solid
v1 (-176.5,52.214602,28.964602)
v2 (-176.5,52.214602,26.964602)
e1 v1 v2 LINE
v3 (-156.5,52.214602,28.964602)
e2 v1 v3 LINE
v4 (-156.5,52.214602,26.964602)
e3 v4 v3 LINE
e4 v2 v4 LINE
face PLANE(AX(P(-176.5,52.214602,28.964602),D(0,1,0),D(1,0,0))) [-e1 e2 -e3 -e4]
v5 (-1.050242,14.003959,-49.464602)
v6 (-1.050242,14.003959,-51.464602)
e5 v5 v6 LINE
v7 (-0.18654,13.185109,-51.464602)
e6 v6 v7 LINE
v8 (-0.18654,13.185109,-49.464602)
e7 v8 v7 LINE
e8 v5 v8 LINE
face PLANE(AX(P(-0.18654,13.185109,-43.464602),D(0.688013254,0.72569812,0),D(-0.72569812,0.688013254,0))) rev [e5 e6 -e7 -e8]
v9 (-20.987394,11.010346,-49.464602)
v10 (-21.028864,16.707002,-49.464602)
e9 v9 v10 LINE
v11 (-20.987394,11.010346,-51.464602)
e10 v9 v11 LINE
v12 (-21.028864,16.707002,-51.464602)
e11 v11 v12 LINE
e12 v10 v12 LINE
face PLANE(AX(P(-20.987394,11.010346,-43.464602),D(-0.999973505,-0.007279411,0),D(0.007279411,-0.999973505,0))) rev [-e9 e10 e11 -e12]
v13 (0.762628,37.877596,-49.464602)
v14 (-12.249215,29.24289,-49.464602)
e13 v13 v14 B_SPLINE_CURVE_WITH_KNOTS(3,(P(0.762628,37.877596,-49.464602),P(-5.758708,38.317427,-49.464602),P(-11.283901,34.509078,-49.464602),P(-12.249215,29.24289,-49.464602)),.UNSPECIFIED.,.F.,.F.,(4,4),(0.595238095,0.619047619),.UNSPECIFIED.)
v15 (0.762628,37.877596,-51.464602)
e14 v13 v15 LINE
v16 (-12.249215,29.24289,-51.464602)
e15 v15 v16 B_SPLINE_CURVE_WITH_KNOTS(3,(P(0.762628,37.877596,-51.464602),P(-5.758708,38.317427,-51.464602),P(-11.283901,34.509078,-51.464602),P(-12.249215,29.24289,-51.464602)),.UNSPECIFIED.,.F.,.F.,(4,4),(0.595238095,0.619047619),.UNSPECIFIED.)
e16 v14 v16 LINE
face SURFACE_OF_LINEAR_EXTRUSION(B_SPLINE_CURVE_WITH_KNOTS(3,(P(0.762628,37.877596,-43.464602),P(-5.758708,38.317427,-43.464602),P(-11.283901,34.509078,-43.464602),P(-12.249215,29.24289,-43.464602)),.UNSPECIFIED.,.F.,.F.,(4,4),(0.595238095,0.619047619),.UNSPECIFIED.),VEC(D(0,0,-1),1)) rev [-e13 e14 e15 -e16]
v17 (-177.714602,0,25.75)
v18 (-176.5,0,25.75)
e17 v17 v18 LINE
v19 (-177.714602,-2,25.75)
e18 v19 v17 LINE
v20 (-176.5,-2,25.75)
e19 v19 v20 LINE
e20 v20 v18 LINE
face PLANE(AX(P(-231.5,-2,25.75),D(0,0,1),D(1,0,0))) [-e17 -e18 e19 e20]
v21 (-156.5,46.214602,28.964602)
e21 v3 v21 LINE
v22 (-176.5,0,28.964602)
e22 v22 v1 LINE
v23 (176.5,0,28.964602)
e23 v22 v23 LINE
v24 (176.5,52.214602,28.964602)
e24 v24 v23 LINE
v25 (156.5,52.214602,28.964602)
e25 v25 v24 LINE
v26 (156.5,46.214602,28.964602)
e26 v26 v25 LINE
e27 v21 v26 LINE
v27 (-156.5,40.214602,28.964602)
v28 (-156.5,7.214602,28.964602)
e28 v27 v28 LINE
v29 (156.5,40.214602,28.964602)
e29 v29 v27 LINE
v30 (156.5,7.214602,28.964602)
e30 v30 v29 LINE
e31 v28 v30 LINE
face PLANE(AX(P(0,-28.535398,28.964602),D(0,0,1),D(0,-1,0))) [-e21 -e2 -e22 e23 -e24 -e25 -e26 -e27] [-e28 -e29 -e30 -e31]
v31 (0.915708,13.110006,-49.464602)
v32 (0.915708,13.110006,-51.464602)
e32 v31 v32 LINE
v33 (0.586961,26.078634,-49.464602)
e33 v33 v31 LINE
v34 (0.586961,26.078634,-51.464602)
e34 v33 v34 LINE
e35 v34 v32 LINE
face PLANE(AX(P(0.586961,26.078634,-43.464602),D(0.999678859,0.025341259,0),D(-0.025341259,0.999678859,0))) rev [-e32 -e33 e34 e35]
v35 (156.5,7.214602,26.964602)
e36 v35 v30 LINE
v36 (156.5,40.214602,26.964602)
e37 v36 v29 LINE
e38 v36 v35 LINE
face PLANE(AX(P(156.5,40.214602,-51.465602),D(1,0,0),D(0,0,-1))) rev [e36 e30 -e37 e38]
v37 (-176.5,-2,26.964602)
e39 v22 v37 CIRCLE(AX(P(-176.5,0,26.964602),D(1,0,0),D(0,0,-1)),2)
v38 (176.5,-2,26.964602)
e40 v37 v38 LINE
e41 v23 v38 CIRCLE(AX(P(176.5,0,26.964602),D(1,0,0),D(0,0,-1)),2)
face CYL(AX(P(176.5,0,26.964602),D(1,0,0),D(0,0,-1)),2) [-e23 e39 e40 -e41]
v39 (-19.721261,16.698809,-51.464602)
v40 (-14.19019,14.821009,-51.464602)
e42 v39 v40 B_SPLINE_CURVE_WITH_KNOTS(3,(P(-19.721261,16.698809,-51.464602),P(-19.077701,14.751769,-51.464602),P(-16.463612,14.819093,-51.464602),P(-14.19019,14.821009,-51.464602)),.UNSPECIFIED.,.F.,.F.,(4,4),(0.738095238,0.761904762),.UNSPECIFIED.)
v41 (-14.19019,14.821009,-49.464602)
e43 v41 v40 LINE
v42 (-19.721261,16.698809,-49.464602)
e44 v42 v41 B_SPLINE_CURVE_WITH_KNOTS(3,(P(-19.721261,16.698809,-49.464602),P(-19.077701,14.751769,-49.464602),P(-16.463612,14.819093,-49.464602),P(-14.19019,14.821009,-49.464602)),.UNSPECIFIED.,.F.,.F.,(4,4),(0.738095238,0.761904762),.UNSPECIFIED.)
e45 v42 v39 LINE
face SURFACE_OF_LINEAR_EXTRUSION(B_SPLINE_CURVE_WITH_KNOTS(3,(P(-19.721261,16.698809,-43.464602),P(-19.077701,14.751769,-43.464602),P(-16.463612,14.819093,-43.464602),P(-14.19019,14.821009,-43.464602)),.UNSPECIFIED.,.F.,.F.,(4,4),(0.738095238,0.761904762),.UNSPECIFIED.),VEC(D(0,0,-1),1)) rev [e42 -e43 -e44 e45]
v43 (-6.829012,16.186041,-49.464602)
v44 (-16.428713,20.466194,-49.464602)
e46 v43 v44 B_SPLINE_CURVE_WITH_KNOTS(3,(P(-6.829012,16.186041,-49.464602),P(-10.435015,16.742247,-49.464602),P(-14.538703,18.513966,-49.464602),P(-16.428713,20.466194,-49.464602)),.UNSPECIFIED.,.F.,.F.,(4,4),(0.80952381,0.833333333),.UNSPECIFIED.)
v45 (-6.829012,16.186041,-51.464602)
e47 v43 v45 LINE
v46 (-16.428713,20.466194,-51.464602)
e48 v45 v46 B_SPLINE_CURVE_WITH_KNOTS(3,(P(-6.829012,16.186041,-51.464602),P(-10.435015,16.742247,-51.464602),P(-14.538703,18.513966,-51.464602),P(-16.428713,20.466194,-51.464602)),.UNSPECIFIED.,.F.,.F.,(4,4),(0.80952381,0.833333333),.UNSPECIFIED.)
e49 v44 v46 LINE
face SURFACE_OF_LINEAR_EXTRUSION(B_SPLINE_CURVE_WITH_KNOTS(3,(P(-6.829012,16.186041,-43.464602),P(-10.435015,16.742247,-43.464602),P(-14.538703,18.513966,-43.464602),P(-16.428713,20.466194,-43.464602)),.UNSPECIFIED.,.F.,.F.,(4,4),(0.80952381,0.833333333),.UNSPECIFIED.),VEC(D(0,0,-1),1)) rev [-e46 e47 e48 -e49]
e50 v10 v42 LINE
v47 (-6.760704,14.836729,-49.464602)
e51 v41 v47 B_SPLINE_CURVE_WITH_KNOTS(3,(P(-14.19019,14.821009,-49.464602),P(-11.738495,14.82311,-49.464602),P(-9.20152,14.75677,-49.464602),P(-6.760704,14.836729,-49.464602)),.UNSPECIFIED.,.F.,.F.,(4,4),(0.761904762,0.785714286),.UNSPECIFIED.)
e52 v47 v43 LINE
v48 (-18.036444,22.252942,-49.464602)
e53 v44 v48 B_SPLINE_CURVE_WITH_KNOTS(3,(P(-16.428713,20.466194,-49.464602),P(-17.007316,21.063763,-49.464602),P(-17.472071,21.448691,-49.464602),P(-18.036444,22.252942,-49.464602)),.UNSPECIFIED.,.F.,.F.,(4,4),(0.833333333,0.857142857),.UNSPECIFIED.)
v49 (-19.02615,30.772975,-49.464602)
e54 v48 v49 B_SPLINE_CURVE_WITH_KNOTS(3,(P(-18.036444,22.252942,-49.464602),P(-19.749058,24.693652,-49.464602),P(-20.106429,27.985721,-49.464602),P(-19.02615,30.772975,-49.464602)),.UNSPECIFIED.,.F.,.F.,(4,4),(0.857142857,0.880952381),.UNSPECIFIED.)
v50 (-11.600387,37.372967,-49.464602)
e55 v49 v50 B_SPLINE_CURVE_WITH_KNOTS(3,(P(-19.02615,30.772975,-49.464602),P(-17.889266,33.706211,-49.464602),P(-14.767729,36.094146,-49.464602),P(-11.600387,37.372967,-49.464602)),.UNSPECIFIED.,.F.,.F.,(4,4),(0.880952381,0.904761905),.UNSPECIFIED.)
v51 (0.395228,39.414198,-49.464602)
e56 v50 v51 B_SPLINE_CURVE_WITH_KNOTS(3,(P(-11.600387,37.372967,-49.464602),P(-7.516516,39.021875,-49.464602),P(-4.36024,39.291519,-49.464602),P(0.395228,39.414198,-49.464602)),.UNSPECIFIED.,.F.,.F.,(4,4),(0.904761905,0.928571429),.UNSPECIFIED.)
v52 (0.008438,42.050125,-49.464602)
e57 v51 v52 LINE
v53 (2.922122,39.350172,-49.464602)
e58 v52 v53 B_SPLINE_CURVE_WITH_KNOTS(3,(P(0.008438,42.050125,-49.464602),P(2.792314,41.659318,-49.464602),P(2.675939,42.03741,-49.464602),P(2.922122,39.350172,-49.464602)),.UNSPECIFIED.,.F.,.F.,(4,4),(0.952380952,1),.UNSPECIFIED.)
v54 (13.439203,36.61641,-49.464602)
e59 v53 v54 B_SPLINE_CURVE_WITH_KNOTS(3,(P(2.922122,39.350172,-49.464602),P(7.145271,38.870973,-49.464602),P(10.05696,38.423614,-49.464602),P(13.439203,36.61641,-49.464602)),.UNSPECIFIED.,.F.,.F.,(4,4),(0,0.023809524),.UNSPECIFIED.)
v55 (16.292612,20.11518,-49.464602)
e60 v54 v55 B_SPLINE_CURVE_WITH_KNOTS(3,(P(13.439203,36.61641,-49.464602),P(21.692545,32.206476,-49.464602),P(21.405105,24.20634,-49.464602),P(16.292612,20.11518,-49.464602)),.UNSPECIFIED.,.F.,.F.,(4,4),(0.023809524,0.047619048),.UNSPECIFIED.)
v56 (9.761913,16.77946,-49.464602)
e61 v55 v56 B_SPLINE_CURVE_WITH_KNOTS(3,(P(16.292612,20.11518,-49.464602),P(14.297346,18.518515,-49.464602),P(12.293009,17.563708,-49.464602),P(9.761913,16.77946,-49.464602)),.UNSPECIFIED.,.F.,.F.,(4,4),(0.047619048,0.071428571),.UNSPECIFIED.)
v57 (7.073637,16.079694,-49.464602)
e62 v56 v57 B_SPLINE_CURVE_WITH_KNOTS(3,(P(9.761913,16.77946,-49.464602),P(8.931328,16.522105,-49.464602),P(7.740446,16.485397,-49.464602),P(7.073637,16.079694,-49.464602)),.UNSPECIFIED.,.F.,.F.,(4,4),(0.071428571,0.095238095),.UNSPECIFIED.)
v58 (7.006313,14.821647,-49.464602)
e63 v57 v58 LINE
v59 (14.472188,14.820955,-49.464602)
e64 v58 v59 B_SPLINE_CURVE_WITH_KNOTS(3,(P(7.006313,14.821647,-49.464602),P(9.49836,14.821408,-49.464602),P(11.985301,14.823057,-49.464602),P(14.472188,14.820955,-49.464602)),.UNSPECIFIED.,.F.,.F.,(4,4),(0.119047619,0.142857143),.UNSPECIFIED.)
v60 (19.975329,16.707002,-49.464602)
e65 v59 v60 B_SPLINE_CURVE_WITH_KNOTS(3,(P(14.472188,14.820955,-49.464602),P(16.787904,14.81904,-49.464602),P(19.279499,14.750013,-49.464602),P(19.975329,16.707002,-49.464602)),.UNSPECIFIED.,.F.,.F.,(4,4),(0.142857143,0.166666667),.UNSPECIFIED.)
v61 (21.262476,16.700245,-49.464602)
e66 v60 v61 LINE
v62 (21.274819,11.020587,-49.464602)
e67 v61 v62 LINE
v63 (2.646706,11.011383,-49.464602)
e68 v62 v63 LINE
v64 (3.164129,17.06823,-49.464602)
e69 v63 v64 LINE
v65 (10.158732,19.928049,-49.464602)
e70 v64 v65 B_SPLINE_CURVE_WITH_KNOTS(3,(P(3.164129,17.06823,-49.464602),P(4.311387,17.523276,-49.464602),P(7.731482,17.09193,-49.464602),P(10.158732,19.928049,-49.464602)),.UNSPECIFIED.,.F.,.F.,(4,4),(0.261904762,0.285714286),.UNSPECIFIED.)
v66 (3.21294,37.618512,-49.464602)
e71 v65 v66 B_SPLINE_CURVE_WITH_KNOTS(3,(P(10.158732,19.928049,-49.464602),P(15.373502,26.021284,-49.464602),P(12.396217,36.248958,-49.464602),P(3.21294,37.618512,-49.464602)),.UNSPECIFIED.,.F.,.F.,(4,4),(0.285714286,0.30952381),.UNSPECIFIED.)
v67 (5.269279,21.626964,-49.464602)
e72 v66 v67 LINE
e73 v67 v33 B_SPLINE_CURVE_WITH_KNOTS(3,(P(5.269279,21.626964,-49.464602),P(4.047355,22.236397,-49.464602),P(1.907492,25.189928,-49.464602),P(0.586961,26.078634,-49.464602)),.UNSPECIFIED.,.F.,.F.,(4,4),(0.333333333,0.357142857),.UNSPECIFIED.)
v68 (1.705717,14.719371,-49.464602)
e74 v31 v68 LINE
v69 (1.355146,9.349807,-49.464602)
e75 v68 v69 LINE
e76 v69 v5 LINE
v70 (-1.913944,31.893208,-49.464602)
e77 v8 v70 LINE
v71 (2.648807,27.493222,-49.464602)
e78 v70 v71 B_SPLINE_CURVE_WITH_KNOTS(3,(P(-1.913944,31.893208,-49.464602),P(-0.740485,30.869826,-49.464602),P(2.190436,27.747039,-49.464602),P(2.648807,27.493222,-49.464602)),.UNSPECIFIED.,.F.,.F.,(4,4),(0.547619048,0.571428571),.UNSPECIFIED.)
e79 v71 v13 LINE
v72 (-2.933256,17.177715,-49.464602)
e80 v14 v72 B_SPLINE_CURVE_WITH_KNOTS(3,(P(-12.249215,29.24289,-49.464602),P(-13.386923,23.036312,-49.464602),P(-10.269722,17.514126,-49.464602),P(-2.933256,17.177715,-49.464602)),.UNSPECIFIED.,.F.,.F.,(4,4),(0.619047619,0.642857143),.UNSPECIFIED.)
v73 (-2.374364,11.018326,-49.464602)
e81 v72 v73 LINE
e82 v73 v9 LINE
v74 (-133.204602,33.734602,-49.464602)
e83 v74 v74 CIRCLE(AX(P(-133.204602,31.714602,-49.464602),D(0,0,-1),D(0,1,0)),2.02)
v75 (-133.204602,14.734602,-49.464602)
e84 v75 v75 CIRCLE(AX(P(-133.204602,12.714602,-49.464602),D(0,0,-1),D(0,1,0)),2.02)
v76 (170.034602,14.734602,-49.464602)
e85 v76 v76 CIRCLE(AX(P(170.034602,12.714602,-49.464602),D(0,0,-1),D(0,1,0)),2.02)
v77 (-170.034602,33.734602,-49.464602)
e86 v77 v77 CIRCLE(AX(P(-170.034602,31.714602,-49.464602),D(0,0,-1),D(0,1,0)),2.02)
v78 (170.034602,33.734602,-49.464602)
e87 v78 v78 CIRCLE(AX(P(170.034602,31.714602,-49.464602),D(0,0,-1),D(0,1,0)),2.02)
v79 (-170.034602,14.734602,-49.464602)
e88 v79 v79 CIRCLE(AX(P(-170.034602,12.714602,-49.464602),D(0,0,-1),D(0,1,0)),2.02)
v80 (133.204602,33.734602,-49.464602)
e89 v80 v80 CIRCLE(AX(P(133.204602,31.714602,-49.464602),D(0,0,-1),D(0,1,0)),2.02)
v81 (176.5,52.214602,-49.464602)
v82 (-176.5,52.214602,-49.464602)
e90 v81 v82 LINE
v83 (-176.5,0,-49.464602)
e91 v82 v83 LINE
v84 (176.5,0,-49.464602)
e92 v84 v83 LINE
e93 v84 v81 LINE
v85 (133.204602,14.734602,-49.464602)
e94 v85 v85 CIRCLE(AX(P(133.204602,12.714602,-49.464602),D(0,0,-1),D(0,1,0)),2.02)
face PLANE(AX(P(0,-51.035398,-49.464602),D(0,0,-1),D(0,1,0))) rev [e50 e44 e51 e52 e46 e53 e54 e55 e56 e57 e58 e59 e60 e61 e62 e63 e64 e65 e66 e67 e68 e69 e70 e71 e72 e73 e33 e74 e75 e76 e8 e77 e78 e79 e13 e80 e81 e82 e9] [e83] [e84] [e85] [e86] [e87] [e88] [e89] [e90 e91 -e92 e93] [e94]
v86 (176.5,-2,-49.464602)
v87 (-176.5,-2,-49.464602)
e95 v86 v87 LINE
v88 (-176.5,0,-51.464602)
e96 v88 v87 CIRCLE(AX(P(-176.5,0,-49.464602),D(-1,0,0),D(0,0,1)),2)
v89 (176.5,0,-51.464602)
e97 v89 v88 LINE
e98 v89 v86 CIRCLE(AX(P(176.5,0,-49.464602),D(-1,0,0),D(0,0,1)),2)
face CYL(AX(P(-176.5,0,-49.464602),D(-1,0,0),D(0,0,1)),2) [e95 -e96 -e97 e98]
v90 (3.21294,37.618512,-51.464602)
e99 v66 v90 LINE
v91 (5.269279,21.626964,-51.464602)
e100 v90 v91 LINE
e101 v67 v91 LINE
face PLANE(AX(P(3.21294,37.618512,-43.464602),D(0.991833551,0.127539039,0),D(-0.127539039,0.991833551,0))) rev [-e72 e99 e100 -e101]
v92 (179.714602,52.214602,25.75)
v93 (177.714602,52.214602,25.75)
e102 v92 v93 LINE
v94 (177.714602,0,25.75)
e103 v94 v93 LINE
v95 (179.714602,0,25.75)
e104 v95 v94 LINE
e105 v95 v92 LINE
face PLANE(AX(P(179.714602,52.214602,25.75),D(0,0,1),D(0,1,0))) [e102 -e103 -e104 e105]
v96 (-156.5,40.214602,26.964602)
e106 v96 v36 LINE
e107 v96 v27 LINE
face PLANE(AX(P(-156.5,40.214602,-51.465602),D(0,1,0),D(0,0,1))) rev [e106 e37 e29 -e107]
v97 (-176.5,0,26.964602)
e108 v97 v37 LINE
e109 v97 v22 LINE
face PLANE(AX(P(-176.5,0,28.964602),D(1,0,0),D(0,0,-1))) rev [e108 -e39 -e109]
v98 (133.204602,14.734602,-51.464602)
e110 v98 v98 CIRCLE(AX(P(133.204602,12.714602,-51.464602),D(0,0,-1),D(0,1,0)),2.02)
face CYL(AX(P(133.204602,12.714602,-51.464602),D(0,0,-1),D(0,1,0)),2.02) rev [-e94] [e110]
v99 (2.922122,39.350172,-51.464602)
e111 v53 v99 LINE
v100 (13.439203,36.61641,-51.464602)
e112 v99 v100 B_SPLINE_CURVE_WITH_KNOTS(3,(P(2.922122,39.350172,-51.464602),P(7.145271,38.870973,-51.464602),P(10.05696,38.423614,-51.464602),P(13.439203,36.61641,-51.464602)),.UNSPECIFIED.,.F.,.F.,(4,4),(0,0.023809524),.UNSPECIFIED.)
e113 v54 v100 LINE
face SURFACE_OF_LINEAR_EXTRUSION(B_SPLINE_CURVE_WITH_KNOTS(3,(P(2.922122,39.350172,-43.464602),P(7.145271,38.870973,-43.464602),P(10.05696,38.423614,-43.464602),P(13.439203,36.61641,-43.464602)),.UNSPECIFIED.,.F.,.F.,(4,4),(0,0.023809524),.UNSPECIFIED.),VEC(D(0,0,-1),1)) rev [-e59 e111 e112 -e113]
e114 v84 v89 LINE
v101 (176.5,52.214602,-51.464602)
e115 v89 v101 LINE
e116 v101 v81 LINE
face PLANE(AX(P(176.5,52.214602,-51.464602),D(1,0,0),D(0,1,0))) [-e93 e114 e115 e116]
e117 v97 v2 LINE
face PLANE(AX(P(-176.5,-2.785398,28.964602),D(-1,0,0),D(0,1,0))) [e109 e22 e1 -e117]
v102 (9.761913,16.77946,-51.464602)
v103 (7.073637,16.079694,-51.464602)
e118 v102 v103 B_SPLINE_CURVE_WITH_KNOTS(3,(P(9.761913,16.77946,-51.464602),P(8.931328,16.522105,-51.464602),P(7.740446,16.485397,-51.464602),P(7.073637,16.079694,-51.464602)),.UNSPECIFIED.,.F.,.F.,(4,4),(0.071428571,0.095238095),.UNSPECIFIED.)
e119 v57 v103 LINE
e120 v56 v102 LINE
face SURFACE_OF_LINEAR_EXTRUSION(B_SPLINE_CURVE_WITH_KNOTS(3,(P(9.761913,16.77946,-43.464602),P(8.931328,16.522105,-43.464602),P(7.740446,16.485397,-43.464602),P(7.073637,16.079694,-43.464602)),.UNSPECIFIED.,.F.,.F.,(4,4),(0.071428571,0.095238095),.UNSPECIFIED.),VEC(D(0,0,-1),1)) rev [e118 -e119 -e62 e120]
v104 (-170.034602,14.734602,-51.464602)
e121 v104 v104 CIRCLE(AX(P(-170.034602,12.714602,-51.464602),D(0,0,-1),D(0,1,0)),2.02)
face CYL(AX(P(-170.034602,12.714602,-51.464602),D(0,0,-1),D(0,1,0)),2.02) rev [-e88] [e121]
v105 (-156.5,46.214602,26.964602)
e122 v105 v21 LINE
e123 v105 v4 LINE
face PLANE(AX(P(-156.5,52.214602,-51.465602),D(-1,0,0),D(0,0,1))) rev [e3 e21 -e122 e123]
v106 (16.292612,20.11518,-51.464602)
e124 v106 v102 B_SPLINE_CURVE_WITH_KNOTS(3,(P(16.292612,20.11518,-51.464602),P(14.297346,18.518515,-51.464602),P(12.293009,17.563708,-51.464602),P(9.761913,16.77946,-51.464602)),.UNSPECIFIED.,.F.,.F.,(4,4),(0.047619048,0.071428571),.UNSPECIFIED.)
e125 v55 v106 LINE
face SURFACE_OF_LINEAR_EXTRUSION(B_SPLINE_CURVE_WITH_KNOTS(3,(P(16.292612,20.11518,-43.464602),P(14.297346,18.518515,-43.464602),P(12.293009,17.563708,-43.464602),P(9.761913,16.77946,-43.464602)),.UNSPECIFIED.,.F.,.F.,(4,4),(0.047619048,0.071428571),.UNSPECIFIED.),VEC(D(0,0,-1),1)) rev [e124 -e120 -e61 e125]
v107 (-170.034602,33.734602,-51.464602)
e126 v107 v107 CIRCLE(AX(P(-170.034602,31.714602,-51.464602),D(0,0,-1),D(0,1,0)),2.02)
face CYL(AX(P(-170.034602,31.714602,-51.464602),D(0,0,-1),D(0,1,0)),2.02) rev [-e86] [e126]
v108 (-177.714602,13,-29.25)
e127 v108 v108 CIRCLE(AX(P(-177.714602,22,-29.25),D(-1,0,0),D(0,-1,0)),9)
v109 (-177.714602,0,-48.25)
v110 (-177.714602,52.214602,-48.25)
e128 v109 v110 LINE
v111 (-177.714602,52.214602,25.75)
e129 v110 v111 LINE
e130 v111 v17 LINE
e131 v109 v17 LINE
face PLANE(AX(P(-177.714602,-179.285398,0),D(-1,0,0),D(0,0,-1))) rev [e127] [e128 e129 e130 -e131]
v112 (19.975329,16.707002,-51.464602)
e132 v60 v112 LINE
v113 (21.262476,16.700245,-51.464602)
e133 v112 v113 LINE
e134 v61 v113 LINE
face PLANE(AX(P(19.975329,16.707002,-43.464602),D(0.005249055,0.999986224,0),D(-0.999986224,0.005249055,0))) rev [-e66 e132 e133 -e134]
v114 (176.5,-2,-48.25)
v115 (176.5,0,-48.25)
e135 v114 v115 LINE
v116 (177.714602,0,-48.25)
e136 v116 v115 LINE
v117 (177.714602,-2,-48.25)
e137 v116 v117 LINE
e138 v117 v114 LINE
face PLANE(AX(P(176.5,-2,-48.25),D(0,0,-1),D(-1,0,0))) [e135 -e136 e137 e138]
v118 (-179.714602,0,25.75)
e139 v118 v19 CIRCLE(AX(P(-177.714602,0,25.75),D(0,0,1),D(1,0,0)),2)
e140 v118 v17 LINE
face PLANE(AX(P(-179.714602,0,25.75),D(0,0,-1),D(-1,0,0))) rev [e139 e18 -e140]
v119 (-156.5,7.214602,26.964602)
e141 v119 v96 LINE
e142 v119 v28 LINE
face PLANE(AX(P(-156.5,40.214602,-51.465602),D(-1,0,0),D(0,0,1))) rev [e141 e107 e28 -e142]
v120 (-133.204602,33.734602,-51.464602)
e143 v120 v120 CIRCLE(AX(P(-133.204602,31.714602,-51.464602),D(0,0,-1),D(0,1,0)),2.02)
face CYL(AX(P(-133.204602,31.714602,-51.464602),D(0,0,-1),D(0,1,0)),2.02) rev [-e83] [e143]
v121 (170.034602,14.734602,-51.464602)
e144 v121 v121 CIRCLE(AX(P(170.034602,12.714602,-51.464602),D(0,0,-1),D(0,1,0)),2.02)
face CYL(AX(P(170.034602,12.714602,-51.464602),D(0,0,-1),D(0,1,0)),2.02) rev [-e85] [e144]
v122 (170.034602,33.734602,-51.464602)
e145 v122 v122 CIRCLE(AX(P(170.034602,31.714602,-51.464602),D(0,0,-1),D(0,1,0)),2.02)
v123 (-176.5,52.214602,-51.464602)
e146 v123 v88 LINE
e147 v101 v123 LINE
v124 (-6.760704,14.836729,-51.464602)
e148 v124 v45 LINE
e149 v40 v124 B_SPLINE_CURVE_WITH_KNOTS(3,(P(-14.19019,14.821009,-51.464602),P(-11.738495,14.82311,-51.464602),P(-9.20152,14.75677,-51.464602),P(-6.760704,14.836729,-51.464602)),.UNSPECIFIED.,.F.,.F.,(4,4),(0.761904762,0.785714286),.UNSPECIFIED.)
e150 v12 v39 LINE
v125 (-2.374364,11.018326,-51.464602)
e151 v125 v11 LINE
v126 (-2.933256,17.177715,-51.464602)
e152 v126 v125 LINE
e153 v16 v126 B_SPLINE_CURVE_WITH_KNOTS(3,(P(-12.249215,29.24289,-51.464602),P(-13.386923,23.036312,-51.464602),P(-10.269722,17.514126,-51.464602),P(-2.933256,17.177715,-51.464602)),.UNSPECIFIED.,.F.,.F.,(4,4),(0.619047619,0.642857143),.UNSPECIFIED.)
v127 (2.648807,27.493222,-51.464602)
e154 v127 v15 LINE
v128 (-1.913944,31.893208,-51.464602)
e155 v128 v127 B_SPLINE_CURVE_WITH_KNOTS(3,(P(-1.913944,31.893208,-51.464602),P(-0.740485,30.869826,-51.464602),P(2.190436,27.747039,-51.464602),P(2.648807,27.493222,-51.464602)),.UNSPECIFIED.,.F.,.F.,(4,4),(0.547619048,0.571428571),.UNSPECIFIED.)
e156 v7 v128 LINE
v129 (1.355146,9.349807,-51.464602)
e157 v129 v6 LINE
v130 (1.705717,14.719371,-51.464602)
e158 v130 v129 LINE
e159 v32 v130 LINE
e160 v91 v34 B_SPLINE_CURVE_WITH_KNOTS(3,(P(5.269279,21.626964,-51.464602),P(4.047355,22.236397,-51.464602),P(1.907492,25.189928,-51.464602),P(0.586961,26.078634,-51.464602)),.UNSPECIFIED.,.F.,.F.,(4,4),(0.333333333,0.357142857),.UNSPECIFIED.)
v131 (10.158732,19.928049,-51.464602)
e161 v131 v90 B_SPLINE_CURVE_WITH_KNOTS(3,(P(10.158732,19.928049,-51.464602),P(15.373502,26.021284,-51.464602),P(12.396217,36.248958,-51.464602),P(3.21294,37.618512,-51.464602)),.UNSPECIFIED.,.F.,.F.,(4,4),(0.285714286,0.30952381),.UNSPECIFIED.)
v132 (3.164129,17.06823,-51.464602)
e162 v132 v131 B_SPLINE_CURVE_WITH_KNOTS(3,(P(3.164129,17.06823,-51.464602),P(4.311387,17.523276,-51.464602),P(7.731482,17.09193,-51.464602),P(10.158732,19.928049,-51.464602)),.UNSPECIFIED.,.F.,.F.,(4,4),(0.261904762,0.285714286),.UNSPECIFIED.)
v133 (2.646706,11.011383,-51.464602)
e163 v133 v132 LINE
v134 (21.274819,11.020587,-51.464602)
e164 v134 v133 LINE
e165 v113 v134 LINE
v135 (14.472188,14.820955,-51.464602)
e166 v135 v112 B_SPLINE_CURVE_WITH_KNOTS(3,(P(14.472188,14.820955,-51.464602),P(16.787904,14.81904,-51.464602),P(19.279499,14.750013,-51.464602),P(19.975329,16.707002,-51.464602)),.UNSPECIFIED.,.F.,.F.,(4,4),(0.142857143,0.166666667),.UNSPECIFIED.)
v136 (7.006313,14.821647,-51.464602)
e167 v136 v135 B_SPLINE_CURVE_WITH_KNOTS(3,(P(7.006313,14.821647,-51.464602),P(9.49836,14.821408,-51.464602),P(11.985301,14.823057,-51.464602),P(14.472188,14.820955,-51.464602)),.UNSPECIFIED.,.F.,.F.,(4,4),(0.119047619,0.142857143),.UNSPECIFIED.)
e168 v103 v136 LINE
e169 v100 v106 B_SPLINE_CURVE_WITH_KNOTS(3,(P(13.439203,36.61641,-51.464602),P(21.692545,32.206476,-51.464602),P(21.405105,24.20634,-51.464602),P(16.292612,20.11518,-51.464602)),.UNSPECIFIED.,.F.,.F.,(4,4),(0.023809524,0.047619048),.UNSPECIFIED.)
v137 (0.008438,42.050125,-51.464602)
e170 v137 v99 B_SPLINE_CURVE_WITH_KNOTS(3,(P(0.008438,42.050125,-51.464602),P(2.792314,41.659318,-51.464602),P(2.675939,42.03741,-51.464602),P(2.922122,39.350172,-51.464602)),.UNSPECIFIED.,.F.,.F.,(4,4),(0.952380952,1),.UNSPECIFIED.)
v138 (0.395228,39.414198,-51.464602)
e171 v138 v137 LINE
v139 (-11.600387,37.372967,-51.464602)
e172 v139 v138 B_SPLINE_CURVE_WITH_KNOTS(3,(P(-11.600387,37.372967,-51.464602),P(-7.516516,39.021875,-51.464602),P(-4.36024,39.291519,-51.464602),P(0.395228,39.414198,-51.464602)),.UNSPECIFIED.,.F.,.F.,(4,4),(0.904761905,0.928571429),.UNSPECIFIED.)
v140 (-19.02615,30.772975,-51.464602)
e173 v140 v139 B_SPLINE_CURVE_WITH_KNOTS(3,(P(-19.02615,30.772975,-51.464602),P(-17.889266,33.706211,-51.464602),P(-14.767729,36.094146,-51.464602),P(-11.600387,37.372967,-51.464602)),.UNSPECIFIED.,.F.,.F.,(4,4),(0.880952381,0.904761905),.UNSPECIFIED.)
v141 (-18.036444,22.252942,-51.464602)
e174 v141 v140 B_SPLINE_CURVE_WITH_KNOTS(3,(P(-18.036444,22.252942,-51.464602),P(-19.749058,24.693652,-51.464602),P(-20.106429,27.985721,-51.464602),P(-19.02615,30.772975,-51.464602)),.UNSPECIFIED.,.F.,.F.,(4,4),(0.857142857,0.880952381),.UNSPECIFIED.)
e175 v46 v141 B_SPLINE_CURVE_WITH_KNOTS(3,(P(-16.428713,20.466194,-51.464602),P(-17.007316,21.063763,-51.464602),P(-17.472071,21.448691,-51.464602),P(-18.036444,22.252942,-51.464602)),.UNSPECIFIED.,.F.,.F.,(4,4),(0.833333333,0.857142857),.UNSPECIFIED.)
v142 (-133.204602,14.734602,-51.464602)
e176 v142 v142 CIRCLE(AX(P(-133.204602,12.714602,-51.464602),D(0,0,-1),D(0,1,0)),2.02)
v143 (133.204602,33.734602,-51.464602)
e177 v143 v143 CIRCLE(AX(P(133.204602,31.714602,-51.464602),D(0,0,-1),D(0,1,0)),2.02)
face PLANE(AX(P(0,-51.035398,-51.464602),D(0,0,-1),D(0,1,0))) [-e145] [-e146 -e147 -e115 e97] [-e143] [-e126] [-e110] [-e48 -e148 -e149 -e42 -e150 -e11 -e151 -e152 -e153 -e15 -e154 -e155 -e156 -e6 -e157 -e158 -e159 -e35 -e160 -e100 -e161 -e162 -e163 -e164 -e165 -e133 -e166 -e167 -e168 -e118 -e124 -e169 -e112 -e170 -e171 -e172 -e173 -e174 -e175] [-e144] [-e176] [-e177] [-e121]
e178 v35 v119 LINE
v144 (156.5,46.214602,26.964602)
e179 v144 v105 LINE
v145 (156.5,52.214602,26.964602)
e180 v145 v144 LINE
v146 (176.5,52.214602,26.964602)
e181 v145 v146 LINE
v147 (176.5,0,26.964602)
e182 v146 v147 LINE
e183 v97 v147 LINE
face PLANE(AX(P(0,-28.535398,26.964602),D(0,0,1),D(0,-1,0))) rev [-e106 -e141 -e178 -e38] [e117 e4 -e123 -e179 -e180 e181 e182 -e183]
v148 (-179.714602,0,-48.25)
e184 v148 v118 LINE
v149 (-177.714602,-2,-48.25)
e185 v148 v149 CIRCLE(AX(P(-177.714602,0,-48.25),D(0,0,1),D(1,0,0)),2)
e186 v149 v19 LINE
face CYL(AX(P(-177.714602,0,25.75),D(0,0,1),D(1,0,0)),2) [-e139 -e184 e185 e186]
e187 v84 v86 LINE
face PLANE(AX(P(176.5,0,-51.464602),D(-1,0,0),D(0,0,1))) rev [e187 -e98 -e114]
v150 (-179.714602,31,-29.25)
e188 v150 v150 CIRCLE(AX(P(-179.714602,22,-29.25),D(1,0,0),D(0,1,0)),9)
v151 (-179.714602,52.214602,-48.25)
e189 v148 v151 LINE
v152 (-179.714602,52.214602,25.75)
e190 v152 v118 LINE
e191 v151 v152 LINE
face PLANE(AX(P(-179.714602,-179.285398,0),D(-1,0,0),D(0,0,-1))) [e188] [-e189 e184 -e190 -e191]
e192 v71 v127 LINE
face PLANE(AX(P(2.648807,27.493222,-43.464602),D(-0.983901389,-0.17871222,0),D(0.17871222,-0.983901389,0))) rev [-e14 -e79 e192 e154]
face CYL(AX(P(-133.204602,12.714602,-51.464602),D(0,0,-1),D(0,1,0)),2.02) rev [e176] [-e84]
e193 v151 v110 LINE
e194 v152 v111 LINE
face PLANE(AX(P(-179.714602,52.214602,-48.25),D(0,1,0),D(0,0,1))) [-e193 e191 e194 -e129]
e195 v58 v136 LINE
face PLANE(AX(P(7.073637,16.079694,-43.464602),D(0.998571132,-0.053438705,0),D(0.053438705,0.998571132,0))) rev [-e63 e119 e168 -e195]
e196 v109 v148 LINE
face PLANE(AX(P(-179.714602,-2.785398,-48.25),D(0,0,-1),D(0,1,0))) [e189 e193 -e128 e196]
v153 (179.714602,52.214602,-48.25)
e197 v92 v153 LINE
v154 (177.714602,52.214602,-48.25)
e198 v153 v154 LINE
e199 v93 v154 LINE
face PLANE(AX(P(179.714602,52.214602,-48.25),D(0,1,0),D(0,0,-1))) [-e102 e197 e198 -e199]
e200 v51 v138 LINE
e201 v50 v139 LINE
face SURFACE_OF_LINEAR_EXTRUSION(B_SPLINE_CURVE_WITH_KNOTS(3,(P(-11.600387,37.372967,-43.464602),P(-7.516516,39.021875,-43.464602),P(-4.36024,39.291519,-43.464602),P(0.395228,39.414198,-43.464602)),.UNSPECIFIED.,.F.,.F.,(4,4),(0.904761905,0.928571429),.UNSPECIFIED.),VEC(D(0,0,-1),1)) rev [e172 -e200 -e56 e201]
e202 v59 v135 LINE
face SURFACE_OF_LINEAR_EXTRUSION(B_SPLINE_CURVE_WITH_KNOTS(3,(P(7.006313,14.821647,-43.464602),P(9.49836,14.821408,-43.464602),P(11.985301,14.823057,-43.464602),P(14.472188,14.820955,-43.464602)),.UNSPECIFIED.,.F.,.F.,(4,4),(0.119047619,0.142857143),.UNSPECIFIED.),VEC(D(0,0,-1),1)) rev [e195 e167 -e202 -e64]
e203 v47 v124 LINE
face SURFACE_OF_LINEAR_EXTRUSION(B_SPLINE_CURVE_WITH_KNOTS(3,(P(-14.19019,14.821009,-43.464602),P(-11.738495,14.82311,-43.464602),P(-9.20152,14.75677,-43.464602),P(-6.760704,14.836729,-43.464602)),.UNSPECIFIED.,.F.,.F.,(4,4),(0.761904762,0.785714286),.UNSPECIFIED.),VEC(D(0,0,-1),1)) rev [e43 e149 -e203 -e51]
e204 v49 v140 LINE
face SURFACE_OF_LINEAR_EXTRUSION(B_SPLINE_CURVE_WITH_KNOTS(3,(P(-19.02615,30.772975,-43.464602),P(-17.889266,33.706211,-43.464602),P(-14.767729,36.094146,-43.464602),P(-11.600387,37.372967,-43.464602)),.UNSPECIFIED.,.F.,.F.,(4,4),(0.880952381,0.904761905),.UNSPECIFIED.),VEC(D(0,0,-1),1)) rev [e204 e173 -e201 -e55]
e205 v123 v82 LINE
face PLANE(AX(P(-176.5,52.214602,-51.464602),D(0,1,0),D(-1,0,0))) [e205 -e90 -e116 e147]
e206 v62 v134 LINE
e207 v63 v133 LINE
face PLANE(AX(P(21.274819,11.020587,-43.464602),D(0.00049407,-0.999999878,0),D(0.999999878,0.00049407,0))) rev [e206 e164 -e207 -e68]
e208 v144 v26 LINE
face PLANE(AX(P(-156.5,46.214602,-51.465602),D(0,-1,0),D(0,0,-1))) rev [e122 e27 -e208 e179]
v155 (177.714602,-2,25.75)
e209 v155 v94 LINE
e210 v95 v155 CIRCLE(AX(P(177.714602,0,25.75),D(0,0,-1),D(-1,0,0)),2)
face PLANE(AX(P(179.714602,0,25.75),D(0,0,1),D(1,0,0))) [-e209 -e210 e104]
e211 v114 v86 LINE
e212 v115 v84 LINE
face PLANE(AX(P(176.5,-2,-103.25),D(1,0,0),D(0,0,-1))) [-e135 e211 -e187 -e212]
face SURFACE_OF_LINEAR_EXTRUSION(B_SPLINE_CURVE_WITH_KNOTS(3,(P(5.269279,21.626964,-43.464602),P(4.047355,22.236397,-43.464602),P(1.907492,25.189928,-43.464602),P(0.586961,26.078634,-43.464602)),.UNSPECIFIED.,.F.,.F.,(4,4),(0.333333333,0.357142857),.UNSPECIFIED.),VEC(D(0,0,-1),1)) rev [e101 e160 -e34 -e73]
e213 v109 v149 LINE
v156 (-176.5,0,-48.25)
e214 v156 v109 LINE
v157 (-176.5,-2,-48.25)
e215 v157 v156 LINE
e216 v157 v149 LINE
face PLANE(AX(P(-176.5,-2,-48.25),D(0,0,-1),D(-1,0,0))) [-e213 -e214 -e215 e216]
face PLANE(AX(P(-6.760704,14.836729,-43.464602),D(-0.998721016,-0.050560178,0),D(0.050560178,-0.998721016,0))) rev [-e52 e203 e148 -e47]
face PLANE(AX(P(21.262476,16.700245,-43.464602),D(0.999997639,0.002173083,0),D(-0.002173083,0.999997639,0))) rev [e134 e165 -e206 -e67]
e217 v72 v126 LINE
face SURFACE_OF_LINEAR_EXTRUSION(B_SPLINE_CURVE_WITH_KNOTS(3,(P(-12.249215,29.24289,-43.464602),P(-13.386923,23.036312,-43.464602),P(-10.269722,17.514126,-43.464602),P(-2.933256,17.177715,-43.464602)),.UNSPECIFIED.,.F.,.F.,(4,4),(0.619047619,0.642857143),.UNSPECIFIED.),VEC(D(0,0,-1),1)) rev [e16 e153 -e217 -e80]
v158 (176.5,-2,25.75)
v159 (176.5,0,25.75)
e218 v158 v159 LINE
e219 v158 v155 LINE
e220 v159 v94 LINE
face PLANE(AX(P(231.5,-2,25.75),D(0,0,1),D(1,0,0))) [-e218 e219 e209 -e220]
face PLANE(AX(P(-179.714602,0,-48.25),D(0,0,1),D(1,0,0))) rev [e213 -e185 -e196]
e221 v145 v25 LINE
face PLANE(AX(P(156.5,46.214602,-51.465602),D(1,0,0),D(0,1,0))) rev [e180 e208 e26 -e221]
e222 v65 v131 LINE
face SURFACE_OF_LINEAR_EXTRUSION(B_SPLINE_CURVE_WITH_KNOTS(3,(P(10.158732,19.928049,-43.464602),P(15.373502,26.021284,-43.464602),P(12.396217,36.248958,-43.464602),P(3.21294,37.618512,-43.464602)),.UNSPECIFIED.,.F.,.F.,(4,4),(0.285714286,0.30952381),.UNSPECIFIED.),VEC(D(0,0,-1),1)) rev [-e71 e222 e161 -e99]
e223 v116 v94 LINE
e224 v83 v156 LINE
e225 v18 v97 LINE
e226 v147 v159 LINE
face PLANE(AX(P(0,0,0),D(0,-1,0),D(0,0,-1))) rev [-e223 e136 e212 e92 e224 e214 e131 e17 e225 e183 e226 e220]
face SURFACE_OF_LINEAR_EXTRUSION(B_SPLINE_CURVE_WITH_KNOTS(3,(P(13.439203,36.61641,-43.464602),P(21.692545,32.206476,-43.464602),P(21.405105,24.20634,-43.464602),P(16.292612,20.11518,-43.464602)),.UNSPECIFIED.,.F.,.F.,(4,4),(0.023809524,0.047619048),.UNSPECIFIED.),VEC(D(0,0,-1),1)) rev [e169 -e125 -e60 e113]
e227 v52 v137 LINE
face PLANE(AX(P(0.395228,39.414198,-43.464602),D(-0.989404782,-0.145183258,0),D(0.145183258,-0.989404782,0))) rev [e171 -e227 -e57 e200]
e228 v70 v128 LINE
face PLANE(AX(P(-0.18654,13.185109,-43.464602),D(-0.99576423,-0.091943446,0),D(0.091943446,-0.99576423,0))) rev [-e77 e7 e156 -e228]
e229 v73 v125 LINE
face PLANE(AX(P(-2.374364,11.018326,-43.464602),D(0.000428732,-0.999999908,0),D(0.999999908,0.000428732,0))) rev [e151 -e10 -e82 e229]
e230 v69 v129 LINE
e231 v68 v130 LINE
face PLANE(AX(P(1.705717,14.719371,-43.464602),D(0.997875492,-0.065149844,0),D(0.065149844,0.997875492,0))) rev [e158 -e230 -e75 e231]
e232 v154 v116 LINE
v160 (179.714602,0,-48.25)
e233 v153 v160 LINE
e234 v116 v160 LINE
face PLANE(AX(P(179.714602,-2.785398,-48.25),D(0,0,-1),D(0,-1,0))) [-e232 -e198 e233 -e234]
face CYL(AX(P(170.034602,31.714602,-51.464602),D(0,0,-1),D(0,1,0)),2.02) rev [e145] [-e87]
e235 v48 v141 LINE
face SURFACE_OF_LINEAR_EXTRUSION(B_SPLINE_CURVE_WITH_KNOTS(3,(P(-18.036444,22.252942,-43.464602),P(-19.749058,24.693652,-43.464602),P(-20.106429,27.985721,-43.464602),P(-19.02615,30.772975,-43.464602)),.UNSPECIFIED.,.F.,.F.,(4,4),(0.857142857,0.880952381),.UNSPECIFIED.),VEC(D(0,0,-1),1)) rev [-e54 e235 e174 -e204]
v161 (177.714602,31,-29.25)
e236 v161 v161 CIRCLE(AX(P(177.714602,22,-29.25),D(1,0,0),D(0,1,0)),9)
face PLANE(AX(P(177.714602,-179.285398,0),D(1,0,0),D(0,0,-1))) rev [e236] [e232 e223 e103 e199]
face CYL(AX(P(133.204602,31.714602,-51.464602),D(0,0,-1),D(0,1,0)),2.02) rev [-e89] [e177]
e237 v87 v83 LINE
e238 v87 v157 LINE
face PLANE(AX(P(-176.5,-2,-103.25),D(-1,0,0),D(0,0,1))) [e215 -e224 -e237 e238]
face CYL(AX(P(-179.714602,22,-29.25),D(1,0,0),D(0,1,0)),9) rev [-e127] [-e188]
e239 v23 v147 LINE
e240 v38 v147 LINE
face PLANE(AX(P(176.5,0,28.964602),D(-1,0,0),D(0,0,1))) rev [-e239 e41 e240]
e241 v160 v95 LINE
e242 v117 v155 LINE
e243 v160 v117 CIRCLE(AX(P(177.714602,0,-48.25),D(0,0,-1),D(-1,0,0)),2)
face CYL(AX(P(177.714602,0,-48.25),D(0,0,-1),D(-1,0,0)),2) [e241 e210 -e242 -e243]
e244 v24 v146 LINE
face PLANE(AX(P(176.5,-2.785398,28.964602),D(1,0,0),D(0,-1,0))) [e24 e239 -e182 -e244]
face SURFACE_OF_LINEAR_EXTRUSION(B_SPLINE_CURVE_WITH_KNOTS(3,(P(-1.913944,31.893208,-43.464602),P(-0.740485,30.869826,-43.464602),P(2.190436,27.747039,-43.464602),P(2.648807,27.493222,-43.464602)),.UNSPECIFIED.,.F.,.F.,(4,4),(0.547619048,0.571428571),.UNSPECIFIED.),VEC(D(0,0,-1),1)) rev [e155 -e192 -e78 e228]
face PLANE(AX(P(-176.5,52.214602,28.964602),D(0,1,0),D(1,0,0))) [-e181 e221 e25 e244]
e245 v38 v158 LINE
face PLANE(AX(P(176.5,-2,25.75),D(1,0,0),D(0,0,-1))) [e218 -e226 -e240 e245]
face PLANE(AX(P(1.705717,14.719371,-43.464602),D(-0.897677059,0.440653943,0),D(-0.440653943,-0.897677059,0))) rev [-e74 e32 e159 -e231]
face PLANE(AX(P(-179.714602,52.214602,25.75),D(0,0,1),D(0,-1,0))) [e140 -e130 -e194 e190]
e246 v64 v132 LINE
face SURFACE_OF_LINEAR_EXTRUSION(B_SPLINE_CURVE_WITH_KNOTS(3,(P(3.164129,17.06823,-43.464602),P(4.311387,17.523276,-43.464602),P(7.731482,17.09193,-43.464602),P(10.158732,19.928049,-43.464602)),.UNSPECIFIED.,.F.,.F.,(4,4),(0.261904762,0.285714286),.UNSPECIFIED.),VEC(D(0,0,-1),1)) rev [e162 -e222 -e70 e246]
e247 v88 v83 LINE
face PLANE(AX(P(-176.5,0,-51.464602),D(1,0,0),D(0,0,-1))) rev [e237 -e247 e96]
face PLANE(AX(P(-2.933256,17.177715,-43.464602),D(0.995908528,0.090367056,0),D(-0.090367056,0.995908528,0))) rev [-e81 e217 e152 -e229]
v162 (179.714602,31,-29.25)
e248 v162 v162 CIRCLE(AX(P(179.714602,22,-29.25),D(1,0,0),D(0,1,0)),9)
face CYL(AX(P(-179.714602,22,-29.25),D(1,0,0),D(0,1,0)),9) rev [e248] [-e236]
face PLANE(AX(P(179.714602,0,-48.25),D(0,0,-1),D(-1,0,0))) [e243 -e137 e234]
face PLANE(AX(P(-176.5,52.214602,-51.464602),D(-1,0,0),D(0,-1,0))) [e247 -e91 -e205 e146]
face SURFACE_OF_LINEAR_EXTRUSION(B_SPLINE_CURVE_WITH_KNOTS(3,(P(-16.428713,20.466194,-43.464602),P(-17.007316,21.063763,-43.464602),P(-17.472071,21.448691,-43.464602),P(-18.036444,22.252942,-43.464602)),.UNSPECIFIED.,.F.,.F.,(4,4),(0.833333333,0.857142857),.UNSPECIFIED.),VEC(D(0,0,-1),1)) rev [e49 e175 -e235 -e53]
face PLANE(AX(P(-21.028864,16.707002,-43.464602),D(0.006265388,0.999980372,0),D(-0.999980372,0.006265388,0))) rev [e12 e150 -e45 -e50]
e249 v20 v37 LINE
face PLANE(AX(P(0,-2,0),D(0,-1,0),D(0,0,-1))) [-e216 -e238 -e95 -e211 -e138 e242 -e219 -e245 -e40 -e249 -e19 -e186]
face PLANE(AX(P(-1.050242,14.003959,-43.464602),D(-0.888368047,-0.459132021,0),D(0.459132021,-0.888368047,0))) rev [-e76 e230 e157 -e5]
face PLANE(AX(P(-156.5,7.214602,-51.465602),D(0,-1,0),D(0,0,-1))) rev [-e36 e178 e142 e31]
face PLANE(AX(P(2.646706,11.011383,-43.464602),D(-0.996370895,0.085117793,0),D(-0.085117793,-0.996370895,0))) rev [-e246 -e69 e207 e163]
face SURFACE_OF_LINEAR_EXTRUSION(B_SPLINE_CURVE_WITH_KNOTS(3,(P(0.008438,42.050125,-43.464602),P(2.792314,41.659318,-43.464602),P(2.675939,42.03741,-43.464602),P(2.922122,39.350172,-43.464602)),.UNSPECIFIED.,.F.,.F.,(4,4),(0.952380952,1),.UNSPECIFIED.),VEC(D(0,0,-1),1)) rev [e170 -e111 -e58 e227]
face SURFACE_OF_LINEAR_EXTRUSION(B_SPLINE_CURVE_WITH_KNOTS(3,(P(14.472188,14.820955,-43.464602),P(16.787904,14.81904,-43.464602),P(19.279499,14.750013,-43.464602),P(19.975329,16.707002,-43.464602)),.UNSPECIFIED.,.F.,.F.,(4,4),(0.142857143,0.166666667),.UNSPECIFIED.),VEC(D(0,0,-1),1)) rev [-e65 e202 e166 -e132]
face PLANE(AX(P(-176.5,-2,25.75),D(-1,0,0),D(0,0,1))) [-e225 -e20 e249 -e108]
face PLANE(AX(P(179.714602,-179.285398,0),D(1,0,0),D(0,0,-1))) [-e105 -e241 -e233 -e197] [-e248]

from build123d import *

# Parameters (mm, degrees)
FLANGE_BASE1_DEPTH                             = 2
DOBRA_START                                    = -48.25
DOBRA_ESBO_ADA1_OUTLINE_W                      = 2
DOBRA_ESBO_ADA1_OUTLINE_H                      = 52.214601837
DOBRA_ESBO_ADA1_DEPTH                          = 74
DOBRA_START_2                                  = -176.5
DOBRA_ESBO_ADA1_2_OUTLINE_W                    = 52.214601837
DOBRA_ESBO_ADA1_2_OUTLINE_H                    = 2
DOBRA_ESBO_ADA1_2_DEPTH                        = 353
DOBRA_START_3                                  = -103.25
DOBRA_ESBO_ADA1_3_OUTLINE_W                    = 353
DOBRA_ESBO_ADA1_3_OUTLINE_H                    = 2
DOBRA_ESBO_ADA1_3_DEPTH                        = 51.785398163
DOBRA_START_4                                  = 28.964601837
DOBRA_ESBO_ADA1_4_OUTLINE_W                    = 353
DOBRA_ESBO_ADA1_4_OUTLINE_H                    = 2
DOBRA_ESBO_ADA1_4_DEPTH                        = 51.785398163
DOBRA_ESBO_ADA1_5_DEPTH                        = 74
DOBRA_ESBO_ADA1_6_DEPTH                        = 353
DOBRA_START_5                                  = -231.5
DOBRA_ESBO_ADA1_7_OUTLINE_W                    = 2
DOBRA_ESBO_ADA1_7_OUTLINE_H                    = 74
DOBRA_ESBO_ADA1_7_DEPTH                        = 51.785398163
DOBRA_START_6                                  = 179.714601837
DOBRA_ESBO_ADA1_8_OUTLINE_W                    = 2
DOBRA_ESBO_ADA1_8_OUTLINE_H                    = 74
DOBRA_ESBO_ADA1_8_DEPTH                        = 51.785398163
FURO1_START                                    = -179.714601837
FURO1_OUTLINE_R                                = 9
FURO1_DEPTH                                    = 359.429203674
CORTE_EXTRUS_O1_REACH                          = 205.697
ESBO_O9_W                                      = 313
ESBO_O9_H                                      = 33
ESBO_O9_H_2                                    = 6
BROCA_DE_ROSQUEAR_DE_CANO_PARA_TARRAXA_D_D     = 4.04
BROCA_DE_ROSQUEAR_DE_CANO_PARA_TARRAXA_D_DEPTH = 10
BROCA_DE_ROSQUEAR_DE_CANO_PARA_TARRAXA_D_TIP   = 1.21373845
CORTE_EXTRUS_O2_DEPTH                          = 8


# Read off the part's stored shape, not the designer's step: Dobra esboçada1, Furo1
# Sheet-metal steps are written as plain solids
with BuildPart() as part:
    # Esboço1 → Flange-base1 (new body)
    with BuildSketch(Plane(origin=(0, 0, 0), x_dir=(1, 0, 0), z_dir=(0, 1, 0))):
        Polygon((176.5, 103.25), (176.5, 48.25), (231.5, 48.25), (231.5, -25.75), (176.5, -25.75), (176.5, -80.75), (-176.5, -80.75), (-176.5, -25.75), (-231.5, -25.75), (-231.5, 48.25), (-176.5, 48.25), (-176.5, 103.25), align=None)
    extrude(amount=-FLANGE_BASE1_DEPTH)

    # Dobra esboçada1 outline → Dobra esboçada1 (add)
    with BuildSketch(Plane.XY.offset(DOBRA_START)):
        with Locations((178.714601837, 26.107300919)):
            Rectangle(DOBRA_ESBO_ADA1_OUTLINE_W, DOBRA_ESBO_ADA1_OUTLINE_H)
        with Locations((-178.714601837, 26.107300919)):
            Rectangle(DOBRA_ESBO_ADA1_OUTLINE_W, DOBRA_ESBO_ADA1_OUTLINE_H)
    extrude(amount=DOBRA_ESBO_ADA1_DEPTH)

    # Dobra esbo_ada1 2 outline → Dobra esbo_ada1 2 (add)
    with BuildSketch(Plane.YZ.offset(DOBRA_START_2)):
        with Locations((26.107300919, -50.464601837)):
            Rectangle(DOBRA_ESBO_ADA1_2_OUTLINE_W, DOBRA_ESBO_ADA1_2_OUTLINE_H)
        with Locations((26.107300919, 27.964601837)):
            Rectangle(DOBRA_ESBO_ADA1_2_OUTLINE_W, DOBRA_ESBO_ADA1_2_OUTLINE_H)
    extrude(amount=DOBRA_ESBO_ADA1_2_DEPTH)

    # Dobra esbo_ada1 3 outline → Dobra esbo_ada1 3 (cut)
    with BuildSketch(Plane.XY.offset(DOBRA_START_3)):
        with Locations((0, -1)):
            Rectangle(DOBRA_ESBO_ADA1_3_OUTLINE_W, DOBRA_ESBO_ADA1_3_OUTLINE_H)
    extrude(amount=DOBRA_ESBO_ADA1_3_DEPTH, mode=Mode.SUBTRACT)

    # Dobra esbo_ada1 4 outline → Dobra esbo_ada1 4 (cut)
    with BuildSketch(Plane.XY.offset(DOBRA_START_4)):
        with Locations((0, -1)):
            Rectangle(DOBRA_ESBO_ADA1_4_OUTLINE_W, DOBRA_ESBO_ADA1_4_OUTLINE_H)
    extrude(amount=DOBRA_ESBO_ADA1_4_DEPTH, mode=Mode.SUBTRACT)

    # Dobra esbo_ada1 5 outline → Dobra esbo_ada1 5 (cut)
    with BuildSketch(Plane.XY.offset(DOBRA_START)):
        with BuildLine():
            Line((231.5, 0), (179.714601837, 0))
            ThreePointArc((179.714601837, 0), (179.128815399, -1.414213562), (177.714601837, -2))
            Line((177.714601837, -2), (231.5, -2))
            Line((231.5, -2), (231.5, 0))
        make_face()
        with BuildLine():
            Line((-231.5, -2), (-177.714601837, -2))
            ThreePointArc((-177.714601837, -2), (-179.128815399, -1.414213562), (-179.714601837, 0))
            Line((-179.714601837, 0), (-231.5, 0))
            Line((-231.5, 0), (-231.5, -2))
        make_face()
    extrude(amount=DOBRA_ESBO_ADA1_5_DEPTH, mode=Mode.SUBTRACT)

    # Dobra esbo_ada1 6 outline → Dobra esbo_ada1 6 (cut)
    with BuildSketch(Plane.YZ.offset(DOBRA_START_2)):
        with BuildLine():
            Line((0, -103.25), (0, -51.464601837))
            ThreePointArc((0, -51.464601837), (-1.414213562, -50.878815399), (-2, -49.464601837))
            Line((-2, -49.464601837), (-2, -103.25))
            Line((-2, -103.25), (0, -103.25))
        make_face()
        with BuildLine():
            Line((-2, 80.75), (-2, 26.964601837))
            ThreePointArc((-2, 26.964601837), (-1.414213562, 28.378815399), (0, 28.964601837))
            Line((0, 28.964601837), (0, 80.75))
            Line((0, 80.75), (-2, 80.75))
        make_face()
    extrude(amount=DOBRA_ESBO_ADA1_6_DEPTH, mode=Mode.SUBTRACT)

    # Dobra esbo_ada1 7 outline → Dobra esbo_ada1 7 (cut)
    with BuildSketch(Plane.YZ.offset(DOBRA_START_5)):
        with Locations((-1, -11.25)):
            Rectangle(DOBRA_ESBO_ADA1_7_OUTLINE_W, DOBRA_ESBO_ADA1_7_OUTLINE_H)
    extrude(amount=DOBRA_ESBO_ADA1_7_DEPTH, mode=Mode.SUBTRACT)

    # Dobra esbo_ada1 8 outline → Dobra esbo_ada1 8 (cut)
    with BuildSketch(Plane.YZ.offset(DOBRA_START_6)):
        with Locations((-1, -11.25)):
            Rectangle(DOBRA_ESBO_ADA1_8_OUTLINE_W, DOBRA_ESBO_ADA1_8_OUTLINE_H)
    extrude(amount=DOBRA_ESBO_ADA1_8_DEPTH, mode=Mode.SUBTRACT)

    # Furo1 outline → Furo1 (cut)
    with BuildSketch(Plane.YZ.offset(FURO1_START)):
        with Locations((22, -29.25)):
            Circle(FURO1_OUTLINE_R)
    extrude(amount=FURO1_DEPTH, mode=Mode.SUBTRACT)

    # Esboço9 → Corte-extrusão1 (cut, up to next)
    with BuildSketch(Plane.XY.offset(28.964601837), mode=Mode.PRIVATE) as corte_extrus_o1_sk1:
        with Locations((0, 23.714601837)):
            Rectangle(ESBO_O9_W, ESBO_O9_H)
    corte_extrus_o1_tool1 = extrude(corte_extrus_o1_sk1.sketch, amount=-CORTE_EXTRUS_O1_REACH, mode=Mode.PRIVATE) & part.part
    # Esboço9 → Corte-extrusão1 (cut, up to next)
    with BuildSketch(Plane.XY.offset(28.964601837), mode=Mode.PRIVATE) as corte_extrus_o1_sk2:
        with Locations((0, 49.214601837)):
            Rectangle(ESBO_O9_W, ESBO_O9_H_2)
    corte_extrus_o1_tool2 = extrude(corte_extrus_o1_sk2.sketch, amount=-CORTE_EXTRUS_O1_REACH, mode=Mode.PRIVATE) & part.part
    add(corte_extrus_o1_tool1.solids().sort_by_distance((0, 23.714602, 28.964602))[0], mode=Mode.SUBTRACT)
    add(corte_extrus_o1_tool2.solids().sort_by_distance((0, 49.214602, 28.964602))[0], mode=Mode.SUBTRACT)

    # Broca de rosquear de cano para tarraxa de 1/81
    with Locations(Plane(origin=(0, 0, -51.464601837), x_dir=(-1, 0, 0), z_dir=(0, 0, -1))):
        with Locations((-170.034601837, 31.714601837), (-133.204601837, 31.714601837), (-133.204601837, 12.714601837), (-170.034601837, 12.714601837), (133.204601837, 31.714601837), (133.204601837, 12.714601837), (170.034601837, 12.714601837), (170.034601837, 31.714601837)):
            Hole(BROCA_DE_ROSQUEAR_DE_CANO_PARA_TARRAXA_D_D / 2, depth=BROCA_DE_ROSQUEAR_DE_CANO_PARA_TARRAXA_D_DEPTH)
            with Locations((0, 0, -(BROCA_DE_ROSQUEAR_DE_CANO_PARA_TARRAXA_D_DEPTH + BROCA_DE_ROSQUEAR_DE_CANO_PARA_TARRAXA_D_TIP / 2))):  # 118° drill point
                Cone(0, BROCA_DE_ROSQUEAR_DE_CANO_PARA_TARRAXA_D_D / 2, BROCA_DE_ROSQUEAR_DE_CANO_PARA_TARRAXA_D_TIP, mode=Mode.SUBTRACT)

    # Esboço12 → Corte-extrusão2 (cut)
    with BuildSketch(Plane(origin=(0, 7.850437939, -51.464601837), x_dir=(-1, 0, 0), z_dir=(0, 0, -1))):
        with BuildLine():
            Line((-2.646705655, 3.160945272), (-3.164128855, 9.217791872))
            add(Edge.make_bspline(
                [(-3.164128855, 9.217791872), (-4.311386855, 9.672838072), (-7.731481855, 9.241492472), (-10.158731855, 12.077611072)],
                knots=[0.261904762, 0.261904762, 0.261904762, 0.261904762, 0.285714286, 0.285714286, 0.285714286, 0.285714286], degree=3))
            add(Edge.make_bspline(
                [(-10.158731855, 12.077611072), (-15.373502255, 18.170846472), (-12.396217455, 28.398519872), (-3.212939855, 29.768074072)],
                knots=[0.285714286, 0.285714286, 0.285714286, 0.285714286, 0.30952381, 0.30952381, 0.30952381, 0.30952381], degree=3))
            Line((-3.212939855, 29.768074072), (-5.269279455, 13.776526472))
            add(Edge.make_bspline(
                [(-5.269279455, 13.776526472), (-4.047355255, 14.385959072), (-1.907491655, 17.339490072), (-0.586961255, 18.228196072)],
                knots=[0.333333333, 0.333333333, 0.333333333, 0.333333333, 0.357142857, 0.357142857, 0.357142857, 0.357142857], degree=3))
            Line((-0.586961255, 18.228196072), (-0.9157082, 5.259567806))
            Line((-0.9157082, 5.259567806), (-1.705717355, 6.868932949))
            Line((-1.705717355, 6.868932949), (-1.355146331, 1.499369274))
            Line((-1.355146331, 1.499369274), (1.050242145, 6.153521386))
            Line((1.050242145, 6.153521386), (0.186540145, 5.334670672))
            Line((0.186540145, 5.334670672), (1.913944145, 24.042769872))
            add(Edge.make_bspline(
                [(1.913944145, 24.042769872), (0.740485145, 23.019388072), (-2.190435855, 19.896601272), (-2.648807055, 19.642784072)],
                knots=[0.547619048, 0.547619048, 0.547619048, 0.547619048, 0.571428571, 0.571428571, 0.571428571, 0.571428571], degree=3))
            Line((-2.648807055, 19.642784072), (-0.762627655, 30.027158072))
            add(Edge.make_bspline(
                [(-0.762627655, 30.027158072), (5.758708145, 30.466989072), (11.283900545, 26.658640472), (12.249214545, 21.392452272)],
                knots=[0.595238095, 0.595238095, 0.595238095, 0.595238095, 0.619047619, 0.619047619, 0.619047619, 0.619047619], degree=3))
            add(Edge.make_bspline(
                [(12.249214545, 21.392452272), (13.386923145, 15.185874272), (10.269722345, 9.663687672), (2.933256145, 9.327277472)],
                knots=[0.619047619, 0.619047619, 0.619047619, 0.619047619, 0.642857143, 0.642857143, 0.642857143, 0.642857143], degree=3))
            Line((2.933256145, 9.327277472), (2.374363545, 3.167887872))
            Line((2.374363545, 3.167887872), (20.987394345, 3.159907872))
            Line((20.987394345, 3.159907872), (21.028863745, 8.856563872))
            Line((21.028863745, 8.856563872), (19.721260945, 8.848371072))
            add(Edge.make_bspline(
                [(19.721260945, 8.848371072), (19.077700545, 6.901330872), (16.463612145, 6.968655472), (14.190189945, 6.970570672)],
                knots=[0.738095238, 0.738095238, 0.738095238, 0.738095238, 0.761904762, 0.761904762, 0.761904762, 0.761904762], degree=3))
            add(Edge.make_bspline(
                [(14.190189945, 6.970570672), (11.738494545, 6.972672072), (9.201519545, 6.906331672), (6.760703545, 6.986291272)],
                knots=[0.761904762, 0.761904762, 0.761904762, 0.761904762, 0.785714286, 0.785714286, 0.785714286, 0.785714286], degree=3))
            Line((6.760703545, 6.986291272), (6.829012345, 8.335602872))
            add(Edge.make_bspline(
                [(6.829012345, 8.335602872), (10.435014745, 8.891808872), (14.538703145, 10.663528472), (16.428712945, 12.615755672)],
                knots=[0.80952381, 0.80952381, 0.80952381, 0.80952381, 0.833333333, 0.833333333, 0.833333333, 0.833333333], degree=3))
            add(Edge.make_bspline(
                [(16.428712945, 12.615755672), (17.007316145, 13.213324672), (17.472071345, 13.598253272), (18.036443545, 14.402504272)],
                knots=[0.833333333, 0.833333333, 0.833333333, 0.833333333, 0.857142857, 0.857142857, 0.857142857, 0.857142857], degree=3))
            add(Edge.make_bspline(
                [(18.036443545, 14.402504272), (19.749057945, 16.843213872), (20.106428945, 20.135283072), (19.026149745, 22.922537472)],
                knots=[0.857142857, 0.857142857, 0.857142857, 0.857142857, 0.880952381, 0.880952381, 0.880952381, 0.880952381], degree=3))
            add(Edge.make_bspline(
                [(19.026149745, 22.922537472), (17.889265745, 25.855772672), (14.767729145, 28.243707872), (11.600387345, 29.522529472)],
                knots=[0.880952381, 0.880952381, 0.880952381, 0.880952381, 0.904761905, 0.904761905, 0.904761905, 0.904761905], degree=3))
            add(Edge.make_bspline(
                [(11.600387345, 29.522529472), (7.516515945, 31.171436872), (4.360239745, 31.441081072), (-0.395228455, 31.563760272)],
                knots=[0.904761905, 0.904761905, 0.904761905, 0.904761905, 0.928571429, 0.928571429, 0.928571429, 0.928571429], degree=3))
            Line((-0.395228455, 31.563760272), (-0.008437855, 34.199687272))
            add(Edge.make_bspline(
                [(-0.008437855, 34.199687272), (-2.792314055, 33.808880072), (-2.675939055, 34.186972472), (-2.922122055, 31.499734072)],
                knots=[0.952380952, 0.952380952, 0.952380952, 0.952380952, 1, 1, 1, 1], degree=3))
            add(Edge.make_bspline(
                [(-2.922122055, 31.499734072), (-7.145271055, 31.020535072), (-10.056960255, 30.573176272), (-13.439203455, 28.765972272)],
                knots=[0, 0, 0, 0, 0.023809524, 0.023809524, 0.023809524, 0.023809524], degree=3))
            add(Edge.make_bspline(
                [(-13.439203455, 28.765972272), (-21.692545055, 24.356038072), (-21.405105455, 16.355901872), (-16.292612055, 12.264742072)],
                knots=[0.023809524, 0.023809524, 0.023809524, 0.023809524, 0.047619048, 0.047619048, 0.047619048, 0.047619048], degree=3))
            add(Edge.make_bspline(
                [(-16.292612055, 12.264742072), (-14.297346055, 10.668077072), (-12.293009455, 9.713270072), (-9.761913055, 8.929022272)],
                knots=[0.047619048, 0.047619048, 0.047619048, 0.047619048, 0.071428571, 0.071428571, 0.071428571, 0.071428571], degree=3))
            add(Edge.make_bspline(
                [(-9.761913055, 8.929022272), (-8.931328055, 8.671667272), (-7.740446055, 8.634959272), (-7.073637255, 8.229256072)],
                knots=[0.071428571, 0.071428571, 0.071428571, 0.071428571, 0.095238095, 0.095238095, 0.095238095, 0.095238095], degree=3))
            Line((-7.073637255, 8.229256072), (-7.006312655, 6.971209072))
            add(Edge.make_bspline(
                [(-7.006312655, 6.971209072), (-9.498360255, 6.970969672), (-11.985300655, 6.972618872), (-14.472187855, 6.970517472)],
                knots=[0.119047619, 0.119047619, 0.119047619, 0.119047619, 0.142857143, 0.142857143, 0.142857143, 0.142857143], degree=3))
            add(Edge.make_bspline(
                [(-14.472187855, 6.970517472), (-16.787904055, 6.968602272), (-19.279499455, 6.899575272), (-19.975328855, 8.856563872)],
                knots=[0.142857143, 0.142857143, 0.142857143, 0.142857143, 0.166666667, 0.166666667, 0.166666667, 0.166666667], degree=3))
            Line((-19.975328855, 8.856563872), (-21.262476255, 8.849807472))
            Line((-21.262476255, 8.849807472), (-21.274818655, 3.170148872))
            Line((-21.274818655, 3.170148872), (-2.646705655, 3.160945272))
        make_face()
    extrude(amount=-CORTE_EXTRUS_O2_DEPTH, mode=Mode.SUBTRACT)


solid = part.part
